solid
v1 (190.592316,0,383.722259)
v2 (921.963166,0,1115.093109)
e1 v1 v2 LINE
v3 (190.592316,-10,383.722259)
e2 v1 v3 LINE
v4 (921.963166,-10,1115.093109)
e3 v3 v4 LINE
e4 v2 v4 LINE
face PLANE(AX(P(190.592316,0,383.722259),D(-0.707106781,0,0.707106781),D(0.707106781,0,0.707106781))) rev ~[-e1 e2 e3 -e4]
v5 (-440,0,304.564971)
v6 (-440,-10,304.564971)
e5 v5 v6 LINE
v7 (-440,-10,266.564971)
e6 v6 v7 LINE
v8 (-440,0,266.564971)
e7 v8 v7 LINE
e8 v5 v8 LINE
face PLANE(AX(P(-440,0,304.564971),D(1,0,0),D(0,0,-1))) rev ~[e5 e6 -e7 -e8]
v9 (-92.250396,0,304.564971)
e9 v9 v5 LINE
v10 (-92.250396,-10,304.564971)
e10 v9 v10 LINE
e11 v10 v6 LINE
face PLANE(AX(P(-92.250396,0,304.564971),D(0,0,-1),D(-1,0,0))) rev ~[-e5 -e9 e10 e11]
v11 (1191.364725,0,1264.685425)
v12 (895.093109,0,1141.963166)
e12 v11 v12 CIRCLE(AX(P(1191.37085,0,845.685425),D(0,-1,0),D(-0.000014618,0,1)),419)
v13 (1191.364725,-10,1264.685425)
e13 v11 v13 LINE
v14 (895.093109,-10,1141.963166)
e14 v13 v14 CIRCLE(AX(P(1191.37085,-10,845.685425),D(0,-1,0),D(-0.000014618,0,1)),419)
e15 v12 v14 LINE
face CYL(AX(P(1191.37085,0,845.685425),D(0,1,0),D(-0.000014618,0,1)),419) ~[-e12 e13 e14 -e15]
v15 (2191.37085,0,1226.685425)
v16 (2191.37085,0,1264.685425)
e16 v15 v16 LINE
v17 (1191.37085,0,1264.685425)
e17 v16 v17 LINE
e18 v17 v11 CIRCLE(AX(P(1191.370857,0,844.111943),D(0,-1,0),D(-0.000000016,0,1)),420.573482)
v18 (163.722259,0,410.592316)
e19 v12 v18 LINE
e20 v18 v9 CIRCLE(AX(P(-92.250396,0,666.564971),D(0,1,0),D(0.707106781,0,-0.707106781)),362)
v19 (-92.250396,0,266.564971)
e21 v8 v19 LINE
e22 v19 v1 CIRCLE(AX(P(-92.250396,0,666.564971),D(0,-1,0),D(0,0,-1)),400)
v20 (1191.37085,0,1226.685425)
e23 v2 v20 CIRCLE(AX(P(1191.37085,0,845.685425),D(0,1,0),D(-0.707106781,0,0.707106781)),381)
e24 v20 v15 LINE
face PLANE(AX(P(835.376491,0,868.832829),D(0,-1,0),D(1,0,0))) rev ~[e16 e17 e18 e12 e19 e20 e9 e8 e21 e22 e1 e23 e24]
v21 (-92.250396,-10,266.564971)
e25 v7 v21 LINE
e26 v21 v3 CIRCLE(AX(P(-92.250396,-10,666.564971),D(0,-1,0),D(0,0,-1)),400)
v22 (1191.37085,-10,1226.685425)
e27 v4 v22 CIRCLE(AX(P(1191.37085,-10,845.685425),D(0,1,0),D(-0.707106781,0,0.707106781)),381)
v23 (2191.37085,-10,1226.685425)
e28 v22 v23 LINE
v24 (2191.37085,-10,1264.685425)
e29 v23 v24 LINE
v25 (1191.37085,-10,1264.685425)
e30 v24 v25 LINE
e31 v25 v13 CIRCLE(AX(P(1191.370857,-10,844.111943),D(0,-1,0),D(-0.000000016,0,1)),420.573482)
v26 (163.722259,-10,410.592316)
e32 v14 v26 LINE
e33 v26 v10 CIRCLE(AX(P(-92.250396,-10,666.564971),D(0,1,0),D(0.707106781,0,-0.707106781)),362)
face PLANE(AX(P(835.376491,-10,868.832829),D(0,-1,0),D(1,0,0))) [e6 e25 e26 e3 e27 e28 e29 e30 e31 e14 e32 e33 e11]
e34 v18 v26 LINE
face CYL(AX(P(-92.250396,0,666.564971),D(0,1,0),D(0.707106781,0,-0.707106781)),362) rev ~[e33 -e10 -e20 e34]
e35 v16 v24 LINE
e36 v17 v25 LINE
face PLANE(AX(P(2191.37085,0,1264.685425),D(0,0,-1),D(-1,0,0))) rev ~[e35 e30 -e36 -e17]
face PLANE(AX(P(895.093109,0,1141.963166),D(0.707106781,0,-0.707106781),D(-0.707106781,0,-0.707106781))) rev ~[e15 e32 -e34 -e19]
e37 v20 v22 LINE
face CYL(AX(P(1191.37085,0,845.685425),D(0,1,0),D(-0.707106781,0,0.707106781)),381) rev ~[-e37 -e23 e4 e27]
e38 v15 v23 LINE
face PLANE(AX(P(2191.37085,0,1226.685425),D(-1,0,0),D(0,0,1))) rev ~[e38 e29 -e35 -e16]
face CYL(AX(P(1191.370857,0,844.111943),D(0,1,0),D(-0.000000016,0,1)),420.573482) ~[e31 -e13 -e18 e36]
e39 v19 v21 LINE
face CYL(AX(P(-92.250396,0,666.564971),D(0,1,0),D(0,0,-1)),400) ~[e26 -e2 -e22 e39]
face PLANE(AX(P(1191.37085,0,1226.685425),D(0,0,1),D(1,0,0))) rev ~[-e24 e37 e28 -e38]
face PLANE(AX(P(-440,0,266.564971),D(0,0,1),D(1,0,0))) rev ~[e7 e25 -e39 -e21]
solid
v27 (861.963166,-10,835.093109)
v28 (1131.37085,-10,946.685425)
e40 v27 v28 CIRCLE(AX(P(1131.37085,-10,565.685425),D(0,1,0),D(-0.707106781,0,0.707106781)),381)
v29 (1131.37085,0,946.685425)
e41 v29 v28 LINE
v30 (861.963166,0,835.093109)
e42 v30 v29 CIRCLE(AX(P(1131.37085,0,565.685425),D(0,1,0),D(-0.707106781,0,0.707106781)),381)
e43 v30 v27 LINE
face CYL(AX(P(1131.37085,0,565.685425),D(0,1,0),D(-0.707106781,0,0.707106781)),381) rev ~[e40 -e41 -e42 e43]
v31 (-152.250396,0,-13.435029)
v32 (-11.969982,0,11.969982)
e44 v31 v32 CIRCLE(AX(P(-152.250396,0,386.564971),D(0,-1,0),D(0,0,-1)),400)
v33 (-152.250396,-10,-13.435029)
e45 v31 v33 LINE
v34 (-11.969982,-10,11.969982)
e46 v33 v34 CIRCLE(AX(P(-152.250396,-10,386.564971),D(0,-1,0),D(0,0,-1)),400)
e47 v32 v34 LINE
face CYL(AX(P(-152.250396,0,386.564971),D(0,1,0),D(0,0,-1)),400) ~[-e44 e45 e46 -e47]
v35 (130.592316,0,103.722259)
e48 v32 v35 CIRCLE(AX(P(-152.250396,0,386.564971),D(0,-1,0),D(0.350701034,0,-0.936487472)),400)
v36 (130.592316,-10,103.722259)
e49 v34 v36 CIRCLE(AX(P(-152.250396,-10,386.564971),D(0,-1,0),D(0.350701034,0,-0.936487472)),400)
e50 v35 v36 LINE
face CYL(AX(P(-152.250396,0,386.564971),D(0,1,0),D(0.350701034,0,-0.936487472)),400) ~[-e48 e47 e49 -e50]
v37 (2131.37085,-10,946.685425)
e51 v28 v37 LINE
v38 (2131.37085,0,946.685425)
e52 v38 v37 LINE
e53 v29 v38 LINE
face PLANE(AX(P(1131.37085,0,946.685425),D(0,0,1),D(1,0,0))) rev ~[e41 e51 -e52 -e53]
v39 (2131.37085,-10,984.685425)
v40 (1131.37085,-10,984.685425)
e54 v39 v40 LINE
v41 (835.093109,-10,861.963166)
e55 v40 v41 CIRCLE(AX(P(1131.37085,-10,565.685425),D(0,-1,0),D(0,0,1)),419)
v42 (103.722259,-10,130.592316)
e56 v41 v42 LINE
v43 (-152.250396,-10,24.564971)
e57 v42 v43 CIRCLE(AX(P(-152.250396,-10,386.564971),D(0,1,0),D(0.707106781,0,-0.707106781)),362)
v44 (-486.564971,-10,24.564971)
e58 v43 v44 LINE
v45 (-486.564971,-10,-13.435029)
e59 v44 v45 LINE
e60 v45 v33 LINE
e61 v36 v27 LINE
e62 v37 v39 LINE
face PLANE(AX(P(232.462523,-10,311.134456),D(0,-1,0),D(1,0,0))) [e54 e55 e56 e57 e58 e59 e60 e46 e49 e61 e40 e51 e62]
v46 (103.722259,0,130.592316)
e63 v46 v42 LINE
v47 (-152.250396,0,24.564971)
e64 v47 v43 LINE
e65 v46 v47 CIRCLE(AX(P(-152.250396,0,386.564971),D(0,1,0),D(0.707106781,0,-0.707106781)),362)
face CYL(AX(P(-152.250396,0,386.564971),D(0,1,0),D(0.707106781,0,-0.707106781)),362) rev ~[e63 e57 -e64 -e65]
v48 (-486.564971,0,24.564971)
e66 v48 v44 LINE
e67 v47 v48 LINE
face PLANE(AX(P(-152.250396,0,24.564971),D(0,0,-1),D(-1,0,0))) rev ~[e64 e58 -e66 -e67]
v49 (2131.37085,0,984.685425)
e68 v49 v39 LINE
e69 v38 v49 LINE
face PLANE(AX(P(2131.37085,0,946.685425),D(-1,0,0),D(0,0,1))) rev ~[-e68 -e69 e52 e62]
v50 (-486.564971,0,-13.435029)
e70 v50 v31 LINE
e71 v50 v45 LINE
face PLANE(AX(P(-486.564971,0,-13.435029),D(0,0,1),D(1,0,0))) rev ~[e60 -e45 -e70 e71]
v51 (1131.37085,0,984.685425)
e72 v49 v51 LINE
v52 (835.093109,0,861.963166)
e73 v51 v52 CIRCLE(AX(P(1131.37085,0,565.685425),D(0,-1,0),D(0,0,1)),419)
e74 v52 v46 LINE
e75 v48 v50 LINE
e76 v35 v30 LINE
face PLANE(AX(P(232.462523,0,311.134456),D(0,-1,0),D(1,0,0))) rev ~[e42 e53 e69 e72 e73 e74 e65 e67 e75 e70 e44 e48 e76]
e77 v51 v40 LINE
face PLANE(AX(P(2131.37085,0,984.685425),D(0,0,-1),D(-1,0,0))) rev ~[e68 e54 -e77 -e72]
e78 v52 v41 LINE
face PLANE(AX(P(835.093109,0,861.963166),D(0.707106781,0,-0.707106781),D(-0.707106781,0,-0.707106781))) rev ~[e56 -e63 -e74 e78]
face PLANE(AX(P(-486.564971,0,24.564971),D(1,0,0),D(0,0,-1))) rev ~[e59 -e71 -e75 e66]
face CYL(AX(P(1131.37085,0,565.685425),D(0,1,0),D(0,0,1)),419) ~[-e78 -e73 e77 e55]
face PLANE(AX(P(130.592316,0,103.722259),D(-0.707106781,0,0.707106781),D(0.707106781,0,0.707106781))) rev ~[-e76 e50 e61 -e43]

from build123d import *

# Parameters (mm, degrees)
F1_DEPTH = 10


# Not quite as in the source:
# - a feature names something its author has since deleted; it is built from what else it names


with BuildPart() as f1:
    # F0 (on Front) → F1 (new body)
    with BuildSketch(Plane.XZ):
        with BuildLine():
            Line((897.5679823155, 1139.4882925322), (807.5679823155, 1049.4882925322))
            Line((807.5679823155, 1049.4882925322), (805.0931085813, 1051.9631662664))
            Line((805.0931085813, 1051.9631662664), (163.7222586828, 410.5923163679))
            ThreePointArc((163.7222586828, 410.5923163679), (46.2810064095, 332.1205803884), (-92.2503961067, 304.5649711575))
            Line((-92.2503961067, 304.5649711575), (-105.134062469, 304.5649711575))
            Line((-105.134062469, 304.5649711575), (-440, 304.5649711575))
            Line((-440, 304.5649711575), (-440, 266.5649711575))
            Line((-440, 266.5649711575), (-92.2503961067, 266.5649711575))
            ThreePointArc((-92.2503961067, 266.5649711575), (60.8229768393, 297.0131581529), (190.5923163679, 383.7222586828))
            Line((190.5923163679, 383.7222586828), (921.9631662664, 1115.0931085813))
            ThreePointArc((921.9631662664, 1115.0931085813), (1045.5684621674, 1197.683526836), (1191.3708498985, 1226.6854249492))
            Line((1191.3708498985, 1226.6854249492), (2191.3708498985, 1226.6854249492))
            Line((2191.3708498985, 1226.6854249492), (2191.3708498985, 1245.6854249492))
            Line((2191.3708498985, 1245.6854249492), (2191.3708498985, 1261.1854249041))
            Line((2191.3708498985, 1261.1854249041), (1191.3647249172, 1261.1854249041))
            ThreePointArc((1191.3647249172, 1261.1854249041), (1032.3630543827, 1229.5561987328), (897.5679823155, 1139.4882925322))
        make_face()
        Polygon((805.0931085813, 1051.9631662664), (807.5679823155, 1049.4882925322), (897.5679823155, 1139.4882925322), (895.0931085813, 1141.9631662664), align=None)
        with BuildLine():
            Line((895.0931085813, 1141.9631662664), (897.5679823155, 1139.4882925322))
            ThreePointArc((897.5679823155, 1139.4882925322), (1032.3630543827, 1229.5561987328), (1191.3647249172, 1261.1854249041))
            Line((1191.3647249172, 1261.1854249041), (2191.3708498985, 1261.1854249041))
            Line((2191.3708498985, 1261.1854249041), (2191.3708498985, 1264.6854249492))
            Line((2191.3708498985, 1264.6854249492), (1191.3708498985, 1264.6854249492))
            ThreePointArc((1191.3708498985, 1264.6854249492), (1191.3677874079, 1264.685424938), (1191.3647249172, 1264.6854249045))
            ThreePointArc((1191.3647249172, 1264.6854249045), (1031.0236623694, 1232.7897770967), (895.0931085813, 1141.9631662664))
        make_face()
    extrude(amount=F1_DEPTH)


with BuildPart() as f1b:
    # F0 (on Front) → F1, piece 2 (new body)
    with BuildSketch(Plane.XZ):
        with BuildLine():
            Line((837.5679823155, 859.4882925322), (835.0931085813, 861.9631662664))
            Line((835.0931085813, 861.9631662664), (103.7222586828, 130.5923163679))
            ThreePointArc((103.7222586828, 130.5923163679), (-13.7189935905, 52.1205803884), (-152.2503961067, 24.5649711575))
            Line((-152.2503961067, 24.5649711575), (-486.5649711575, 24.5649711575))
            Line((-486.5649711575, 24.5649711575), (-486.5649711575, -13.4350288425))
            Line((-486.5649711575, -13.4350288425), (-152.2503961067, -13.4350288425))
            ThreePointArc((-152.2503961067, -13.4350288425), (-80.9692466878, -7.0325361232), (-11.9699824698, 11.9699824698))
            ThreePointArc((-11.9699824698, 11.9699824698), (64.2280439518, 50.206405056), (130.5923163679, 103.7222586828))
            Line((130.5923163679, 103.7222586828), (861.9631662664, 835.0931085813))
            Line((861.9631662664, 835.0931085813), (848.5281374239, 848.5281374239))
            Line((848.5281374239, 848.5281374239), (837.5679823155, 859.4882925322))
        make_face()
        with BuildLine():
            ThreePointArc((1131.3708498985, 984.6854249492), (971.0264917375, 952.7909490715), (835.0931085813, 861.9631662664))
            Line((835.0931085813, 861.9631662664), (837.5679823155, 859.4882925322))
            Line((837.5679823155, 859.4882925322), (848.5281374239, 848.5281374239))
            Line((848.5281374239, 848.5281374239), (861.9631662664, 835.0931085813))
            ThreePointArc((861.9631662664, 835.0931085813), (985.5684621674, 917.683526836), (1131.3708498985, 946.6854249492))
            Line((1131.3708498985, 946.6854249492), (1131.3708498985, 965.6854249492))
            Line((1131.3708498985, 965.6854249492), (1131.3708498985, 984.6854249492))
        make_face()
        Polygon((2131.3708498985, 984.6854249492), (1131.3708498985, 984.6854249492), (1131.3708498985, 965.6854249492), (1131.3708498985, 946.6854249492), (2131.3708498985, 946.6854249492), align=None)
    extrude(amount=F1_DEPTH)


solid = Compound([f1.part, f1b.part])
